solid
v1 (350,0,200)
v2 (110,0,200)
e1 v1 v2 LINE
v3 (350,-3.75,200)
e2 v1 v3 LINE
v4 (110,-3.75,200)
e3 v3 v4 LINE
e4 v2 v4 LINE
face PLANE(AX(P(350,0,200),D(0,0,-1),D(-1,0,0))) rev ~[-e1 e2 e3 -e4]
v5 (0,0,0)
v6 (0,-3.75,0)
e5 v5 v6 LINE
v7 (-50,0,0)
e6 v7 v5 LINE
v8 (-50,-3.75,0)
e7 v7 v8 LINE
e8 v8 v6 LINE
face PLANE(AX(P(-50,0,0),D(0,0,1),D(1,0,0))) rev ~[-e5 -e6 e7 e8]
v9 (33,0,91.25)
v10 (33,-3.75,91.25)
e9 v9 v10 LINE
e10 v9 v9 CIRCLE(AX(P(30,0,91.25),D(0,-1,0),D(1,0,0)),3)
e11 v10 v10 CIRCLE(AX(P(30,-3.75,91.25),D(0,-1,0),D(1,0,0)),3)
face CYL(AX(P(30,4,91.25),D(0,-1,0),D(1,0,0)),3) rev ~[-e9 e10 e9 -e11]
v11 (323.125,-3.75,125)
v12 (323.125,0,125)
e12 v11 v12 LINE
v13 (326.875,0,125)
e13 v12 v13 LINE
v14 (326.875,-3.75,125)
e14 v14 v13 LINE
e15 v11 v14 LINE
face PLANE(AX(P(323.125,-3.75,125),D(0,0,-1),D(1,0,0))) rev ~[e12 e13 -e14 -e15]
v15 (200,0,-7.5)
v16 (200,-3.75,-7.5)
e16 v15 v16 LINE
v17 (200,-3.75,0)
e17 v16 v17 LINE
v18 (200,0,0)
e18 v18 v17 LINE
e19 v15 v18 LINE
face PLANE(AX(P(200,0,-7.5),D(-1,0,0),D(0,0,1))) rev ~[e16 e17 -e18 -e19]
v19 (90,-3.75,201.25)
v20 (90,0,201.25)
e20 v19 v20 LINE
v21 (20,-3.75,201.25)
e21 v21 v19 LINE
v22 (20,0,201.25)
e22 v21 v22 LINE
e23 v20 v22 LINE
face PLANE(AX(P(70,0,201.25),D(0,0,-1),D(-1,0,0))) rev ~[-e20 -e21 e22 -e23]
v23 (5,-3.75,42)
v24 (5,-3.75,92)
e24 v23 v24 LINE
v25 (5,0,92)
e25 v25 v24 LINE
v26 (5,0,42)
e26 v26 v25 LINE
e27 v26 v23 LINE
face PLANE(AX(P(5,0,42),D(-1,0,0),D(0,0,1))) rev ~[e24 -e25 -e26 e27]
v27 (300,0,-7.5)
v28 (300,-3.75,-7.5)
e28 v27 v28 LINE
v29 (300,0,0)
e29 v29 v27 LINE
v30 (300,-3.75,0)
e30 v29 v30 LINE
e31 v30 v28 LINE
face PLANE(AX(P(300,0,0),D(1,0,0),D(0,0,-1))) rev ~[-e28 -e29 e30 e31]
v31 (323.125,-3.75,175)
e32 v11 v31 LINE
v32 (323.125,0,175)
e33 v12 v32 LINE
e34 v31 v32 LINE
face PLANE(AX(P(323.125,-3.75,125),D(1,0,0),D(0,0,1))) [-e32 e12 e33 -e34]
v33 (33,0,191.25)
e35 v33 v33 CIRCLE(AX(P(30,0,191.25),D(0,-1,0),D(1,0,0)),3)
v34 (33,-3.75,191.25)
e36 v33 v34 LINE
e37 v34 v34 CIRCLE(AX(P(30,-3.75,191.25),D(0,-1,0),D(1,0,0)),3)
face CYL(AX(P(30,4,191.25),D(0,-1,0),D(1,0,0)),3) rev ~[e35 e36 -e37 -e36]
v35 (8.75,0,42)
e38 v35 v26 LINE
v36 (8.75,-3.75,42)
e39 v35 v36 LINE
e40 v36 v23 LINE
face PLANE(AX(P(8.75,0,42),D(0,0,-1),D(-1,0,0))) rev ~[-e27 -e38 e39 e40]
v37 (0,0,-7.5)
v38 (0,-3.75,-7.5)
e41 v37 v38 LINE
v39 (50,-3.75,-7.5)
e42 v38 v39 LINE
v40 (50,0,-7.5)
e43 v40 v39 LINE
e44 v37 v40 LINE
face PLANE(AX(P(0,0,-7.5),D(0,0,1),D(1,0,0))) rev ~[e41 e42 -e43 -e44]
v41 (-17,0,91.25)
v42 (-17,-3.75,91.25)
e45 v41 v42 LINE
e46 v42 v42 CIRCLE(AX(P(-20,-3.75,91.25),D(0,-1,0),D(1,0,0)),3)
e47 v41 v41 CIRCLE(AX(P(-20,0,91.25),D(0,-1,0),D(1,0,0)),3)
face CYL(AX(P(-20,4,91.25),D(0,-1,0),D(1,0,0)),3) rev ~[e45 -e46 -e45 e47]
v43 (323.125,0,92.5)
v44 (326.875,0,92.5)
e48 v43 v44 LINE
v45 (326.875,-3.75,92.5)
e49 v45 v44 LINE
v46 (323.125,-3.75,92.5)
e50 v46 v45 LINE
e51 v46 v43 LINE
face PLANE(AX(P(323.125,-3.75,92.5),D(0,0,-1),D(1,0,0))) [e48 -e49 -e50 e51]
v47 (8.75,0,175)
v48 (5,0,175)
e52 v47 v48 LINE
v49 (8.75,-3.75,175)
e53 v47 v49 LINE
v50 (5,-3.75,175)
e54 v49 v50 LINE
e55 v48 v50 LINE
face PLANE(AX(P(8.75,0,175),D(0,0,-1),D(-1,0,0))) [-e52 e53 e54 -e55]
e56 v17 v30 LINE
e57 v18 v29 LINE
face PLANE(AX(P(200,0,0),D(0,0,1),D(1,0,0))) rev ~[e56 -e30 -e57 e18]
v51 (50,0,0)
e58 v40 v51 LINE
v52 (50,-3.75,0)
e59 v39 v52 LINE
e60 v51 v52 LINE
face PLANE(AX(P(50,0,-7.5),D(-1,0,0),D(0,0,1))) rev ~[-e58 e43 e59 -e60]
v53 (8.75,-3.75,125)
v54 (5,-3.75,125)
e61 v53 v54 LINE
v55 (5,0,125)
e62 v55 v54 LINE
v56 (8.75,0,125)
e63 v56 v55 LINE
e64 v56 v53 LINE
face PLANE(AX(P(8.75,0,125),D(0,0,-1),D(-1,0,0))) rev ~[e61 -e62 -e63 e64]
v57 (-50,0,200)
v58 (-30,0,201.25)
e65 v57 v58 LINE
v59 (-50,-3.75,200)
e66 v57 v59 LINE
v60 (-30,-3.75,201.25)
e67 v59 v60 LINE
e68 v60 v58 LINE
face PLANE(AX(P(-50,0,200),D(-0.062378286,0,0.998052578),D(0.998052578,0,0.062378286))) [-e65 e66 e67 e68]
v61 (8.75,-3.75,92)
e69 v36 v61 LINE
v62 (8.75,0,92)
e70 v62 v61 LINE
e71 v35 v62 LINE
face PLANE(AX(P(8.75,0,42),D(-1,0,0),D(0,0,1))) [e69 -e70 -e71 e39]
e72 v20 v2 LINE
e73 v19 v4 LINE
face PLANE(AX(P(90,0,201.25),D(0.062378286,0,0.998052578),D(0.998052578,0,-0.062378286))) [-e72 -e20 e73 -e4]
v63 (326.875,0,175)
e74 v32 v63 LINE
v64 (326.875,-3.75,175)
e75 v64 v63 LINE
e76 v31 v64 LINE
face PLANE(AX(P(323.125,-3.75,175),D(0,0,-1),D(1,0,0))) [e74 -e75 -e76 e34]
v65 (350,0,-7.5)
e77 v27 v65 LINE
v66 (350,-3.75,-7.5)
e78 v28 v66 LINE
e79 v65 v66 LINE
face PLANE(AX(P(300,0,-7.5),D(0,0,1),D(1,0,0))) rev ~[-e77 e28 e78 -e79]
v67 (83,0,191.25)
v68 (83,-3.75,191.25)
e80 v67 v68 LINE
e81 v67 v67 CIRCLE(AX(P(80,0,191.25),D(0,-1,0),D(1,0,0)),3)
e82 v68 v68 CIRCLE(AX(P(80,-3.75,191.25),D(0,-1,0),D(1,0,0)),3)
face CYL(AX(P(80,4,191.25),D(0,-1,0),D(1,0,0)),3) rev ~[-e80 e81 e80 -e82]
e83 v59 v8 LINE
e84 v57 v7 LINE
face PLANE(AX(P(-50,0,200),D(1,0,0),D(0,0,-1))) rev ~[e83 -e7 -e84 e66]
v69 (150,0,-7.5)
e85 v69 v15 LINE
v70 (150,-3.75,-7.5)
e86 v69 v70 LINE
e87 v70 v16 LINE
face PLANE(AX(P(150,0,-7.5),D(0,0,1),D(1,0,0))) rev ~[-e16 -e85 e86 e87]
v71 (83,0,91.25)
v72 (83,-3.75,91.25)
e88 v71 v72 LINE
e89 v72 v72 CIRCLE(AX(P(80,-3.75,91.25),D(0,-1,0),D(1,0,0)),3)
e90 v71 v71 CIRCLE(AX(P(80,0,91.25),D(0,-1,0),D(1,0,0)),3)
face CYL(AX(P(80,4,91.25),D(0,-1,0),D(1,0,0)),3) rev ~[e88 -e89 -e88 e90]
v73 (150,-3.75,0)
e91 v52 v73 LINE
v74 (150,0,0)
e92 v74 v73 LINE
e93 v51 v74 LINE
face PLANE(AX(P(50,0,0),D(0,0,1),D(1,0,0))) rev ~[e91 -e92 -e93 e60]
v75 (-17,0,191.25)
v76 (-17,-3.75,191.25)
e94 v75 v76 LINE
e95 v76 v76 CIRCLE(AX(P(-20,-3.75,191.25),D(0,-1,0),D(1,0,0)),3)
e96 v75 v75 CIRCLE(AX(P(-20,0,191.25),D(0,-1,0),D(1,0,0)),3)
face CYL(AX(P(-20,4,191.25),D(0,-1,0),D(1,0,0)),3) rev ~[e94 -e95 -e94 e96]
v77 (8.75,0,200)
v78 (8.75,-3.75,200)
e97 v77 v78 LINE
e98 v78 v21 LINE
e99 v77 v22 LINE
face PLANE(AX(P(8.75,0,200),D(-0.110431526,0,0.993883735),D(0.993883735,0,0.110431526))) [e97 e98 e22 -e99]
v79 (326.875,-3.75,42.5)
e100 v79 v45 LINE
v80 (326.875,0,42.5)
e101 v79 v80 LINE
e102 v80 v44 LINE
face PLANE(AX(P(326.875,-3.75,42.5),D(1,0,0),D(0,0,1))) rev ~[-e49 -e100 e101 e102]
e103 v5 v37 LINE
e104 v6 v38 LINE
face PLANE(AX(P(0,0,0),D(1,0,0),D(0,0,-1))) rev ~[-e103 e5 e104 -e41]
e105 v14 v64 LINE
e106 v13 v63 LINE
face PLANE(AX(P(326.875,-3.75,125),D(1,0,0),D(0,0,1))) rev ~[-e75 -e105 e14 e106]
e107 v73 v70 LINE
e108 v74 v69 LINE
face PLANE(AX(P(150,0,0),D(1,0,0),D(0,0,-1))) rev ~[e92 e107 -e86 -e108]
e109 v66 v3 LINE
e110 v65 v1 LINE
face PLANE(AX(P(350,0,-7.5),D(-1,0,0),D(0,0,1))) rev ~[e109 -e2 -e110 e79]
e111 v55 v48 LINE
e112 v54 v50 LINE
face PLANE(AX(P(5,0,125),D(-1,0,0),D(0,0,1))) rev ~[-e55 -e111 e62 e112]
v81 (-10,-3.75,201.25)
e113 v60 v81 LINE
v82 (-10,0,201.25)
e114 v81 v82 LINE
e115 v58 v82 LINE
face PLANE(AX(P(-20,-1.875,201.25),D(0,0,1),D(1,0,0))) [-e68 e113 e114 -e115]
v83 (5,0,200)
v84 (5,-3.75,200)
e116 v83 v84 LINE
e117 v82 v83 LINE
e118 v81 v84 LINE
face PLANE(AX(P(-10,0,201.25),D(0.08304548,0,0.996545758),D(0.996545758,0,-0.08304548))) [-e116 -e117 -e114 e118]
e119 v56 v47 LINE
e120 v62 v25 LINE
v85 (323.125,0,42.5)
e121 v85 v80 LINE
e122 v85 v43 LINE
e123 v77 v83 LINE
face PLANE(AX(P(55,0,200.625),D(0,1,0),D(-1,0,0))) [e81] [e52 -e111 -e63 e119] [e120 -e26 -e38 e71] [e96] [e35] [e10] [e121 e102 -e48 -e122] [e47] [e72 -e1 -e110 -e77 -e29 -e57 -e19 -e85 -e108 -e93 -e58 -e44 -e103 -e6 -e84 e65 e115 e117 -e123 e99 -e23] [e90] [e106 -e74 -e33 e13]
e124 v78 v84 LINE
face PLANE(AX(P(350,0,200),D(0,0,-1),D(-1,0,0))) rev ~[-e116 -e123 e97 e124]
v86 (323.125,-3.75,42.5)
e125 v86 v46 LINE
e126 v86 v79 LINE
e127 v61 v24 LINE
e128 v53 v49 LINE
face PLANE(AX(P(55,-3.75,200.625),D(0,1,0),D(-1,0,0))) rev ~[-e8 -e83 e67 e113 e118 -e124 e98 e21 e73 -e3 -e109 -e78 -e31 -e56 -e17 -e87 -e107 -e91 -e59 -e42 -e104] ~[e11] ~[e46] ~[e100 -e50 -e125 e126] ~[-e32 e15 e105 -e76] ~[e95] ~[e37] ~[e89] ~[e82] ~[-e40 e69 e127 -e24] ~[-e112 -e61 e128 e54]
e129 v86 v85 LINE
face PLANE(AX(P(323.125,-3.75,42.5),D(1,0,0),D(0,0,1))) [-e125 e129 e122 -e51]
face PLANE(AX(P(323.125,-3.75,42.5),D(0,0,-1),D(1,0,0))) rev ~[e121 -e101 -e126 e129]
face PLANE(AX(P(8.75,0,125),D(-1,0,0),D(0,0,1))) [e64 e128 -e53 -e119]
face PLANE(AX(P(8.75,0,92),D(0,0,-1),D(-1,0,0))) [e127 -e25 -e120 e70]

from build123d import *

# Parameters (mm, degrees)
F1_DEPTH  = 3.75
F2_W      = 3.75
F2_H      = 50
F3_DEPTH  = 3.75
F4_W      = 20
F4_H      = 3.75
F5_DEPTH  = 1.25
F7_D      = 6
F7_DEPTH  = 4
F7_TIP    = 1.8025818571
F8_W      = 30
F8_H      = 1.25
F9_DEPTH  = 3.75
F10_W     = 3.75
F10_H     = 50
F11_DEPTH = 3.75


# Not quite as in the source:
# - a feature names something its author has since deleted; it is built from what else it names


with BuildPart() as f1:
    # F0 (on Front) → F1 (new body)
    with BuildSketch(Plane.XZ):
        Polygon((50, -7.5), (50, 0), (150, 0), (150, -7.5), (200, -7.5), (200, 0), (300, 0), (300, -7.5), (350, -7.5), (350, 0), (350, 200), (0, 200), (-50, 200), (-50, 0), (0, 0), (0, -7.5), align=None)
    extrude(amount=F1_DEPTH)

    # F2 (on face) → F3 (cut)
    with BuildSketch(Plane.XZ.offset(3.75)):
        with Locations((325, 150)):
            Rectangle(F2_W, F2_H)
        with Locations((325, 67.5)):
            Rectangle(F2_W, F2_H)
    extrude(amount=-F3_DEPTH, mode=Mode.SUBTRACT)

    # F4 (on face) → F5 (join)
    with BuildSketch(Plane.XY.offset(200)):
        with Locations((80, -1.875)):
            Rectangle(F4_W, F4_H)
        with Locations((30, -1.875)):
            Rectangle(F4_W, F4_H)
        with Locations((-20, -1.875)):
            Rectangle(F4_W, F4_H)
    extrude(amount=F5_DEPTH)

    # F7
    with Locations(Plane(origin=(0, 0, 0), x_dir=(-1, 0, 0), z_dir=(0, 1, 0))):
        with Locations((-80, 91.25), (-80, 191.25), (-30, 91.25), (20, 91.25), (20, 191.25), (-30, 191.25)):
            Hole(F7_D / 2, depth=F7_DEPTH)
            with Locations((0, 0, -(F7_DEPTH + F7_TIP / 2))):  # 118° drill point
                Cone(0, F7_D / 2, F7_TIP, mode=Mode.SUBTRACT)

    # F8 (on face) → F9 (join)
    with BuildSketch(Plane(origin=(0, 0, 0), x_dir=(-1, 0, 0), z_dir=(0, 1, 0))):
        with Locations((-55, 200.625)):
            Rectangle(F8_W, F8_H)
        Polygon((30, 201.25), (30, 200), (50, 200), align=None)
        Polygon((-90, 200), (-90, 201.25), (-110, 200), align=None)
        Polygon((10, 201.25), (-5, 200), (10, 200), align=None)
        Polygon((-8.75, 200), (-20, 201.25), (-20, 200), align=None)
    extrude(amount=-F9_DEPTH)

    # F10 (on face) → F11 (cut)
    with BuildSketch(Plane(origin=(0, 0, 0), x_dir=(-1, 0, 0), z_dir=(0, 1, 0))):
        with Locations((-6.875, 150)):
            Rectangle(F10_W, F10_H)
        with Locations((-6.875, 67)):
            Rectangle(F10_W, F10_H)
    extrude(amount=-F11_DEPTH, mode=Mode.SUBTRACT)


solid = f1.part
